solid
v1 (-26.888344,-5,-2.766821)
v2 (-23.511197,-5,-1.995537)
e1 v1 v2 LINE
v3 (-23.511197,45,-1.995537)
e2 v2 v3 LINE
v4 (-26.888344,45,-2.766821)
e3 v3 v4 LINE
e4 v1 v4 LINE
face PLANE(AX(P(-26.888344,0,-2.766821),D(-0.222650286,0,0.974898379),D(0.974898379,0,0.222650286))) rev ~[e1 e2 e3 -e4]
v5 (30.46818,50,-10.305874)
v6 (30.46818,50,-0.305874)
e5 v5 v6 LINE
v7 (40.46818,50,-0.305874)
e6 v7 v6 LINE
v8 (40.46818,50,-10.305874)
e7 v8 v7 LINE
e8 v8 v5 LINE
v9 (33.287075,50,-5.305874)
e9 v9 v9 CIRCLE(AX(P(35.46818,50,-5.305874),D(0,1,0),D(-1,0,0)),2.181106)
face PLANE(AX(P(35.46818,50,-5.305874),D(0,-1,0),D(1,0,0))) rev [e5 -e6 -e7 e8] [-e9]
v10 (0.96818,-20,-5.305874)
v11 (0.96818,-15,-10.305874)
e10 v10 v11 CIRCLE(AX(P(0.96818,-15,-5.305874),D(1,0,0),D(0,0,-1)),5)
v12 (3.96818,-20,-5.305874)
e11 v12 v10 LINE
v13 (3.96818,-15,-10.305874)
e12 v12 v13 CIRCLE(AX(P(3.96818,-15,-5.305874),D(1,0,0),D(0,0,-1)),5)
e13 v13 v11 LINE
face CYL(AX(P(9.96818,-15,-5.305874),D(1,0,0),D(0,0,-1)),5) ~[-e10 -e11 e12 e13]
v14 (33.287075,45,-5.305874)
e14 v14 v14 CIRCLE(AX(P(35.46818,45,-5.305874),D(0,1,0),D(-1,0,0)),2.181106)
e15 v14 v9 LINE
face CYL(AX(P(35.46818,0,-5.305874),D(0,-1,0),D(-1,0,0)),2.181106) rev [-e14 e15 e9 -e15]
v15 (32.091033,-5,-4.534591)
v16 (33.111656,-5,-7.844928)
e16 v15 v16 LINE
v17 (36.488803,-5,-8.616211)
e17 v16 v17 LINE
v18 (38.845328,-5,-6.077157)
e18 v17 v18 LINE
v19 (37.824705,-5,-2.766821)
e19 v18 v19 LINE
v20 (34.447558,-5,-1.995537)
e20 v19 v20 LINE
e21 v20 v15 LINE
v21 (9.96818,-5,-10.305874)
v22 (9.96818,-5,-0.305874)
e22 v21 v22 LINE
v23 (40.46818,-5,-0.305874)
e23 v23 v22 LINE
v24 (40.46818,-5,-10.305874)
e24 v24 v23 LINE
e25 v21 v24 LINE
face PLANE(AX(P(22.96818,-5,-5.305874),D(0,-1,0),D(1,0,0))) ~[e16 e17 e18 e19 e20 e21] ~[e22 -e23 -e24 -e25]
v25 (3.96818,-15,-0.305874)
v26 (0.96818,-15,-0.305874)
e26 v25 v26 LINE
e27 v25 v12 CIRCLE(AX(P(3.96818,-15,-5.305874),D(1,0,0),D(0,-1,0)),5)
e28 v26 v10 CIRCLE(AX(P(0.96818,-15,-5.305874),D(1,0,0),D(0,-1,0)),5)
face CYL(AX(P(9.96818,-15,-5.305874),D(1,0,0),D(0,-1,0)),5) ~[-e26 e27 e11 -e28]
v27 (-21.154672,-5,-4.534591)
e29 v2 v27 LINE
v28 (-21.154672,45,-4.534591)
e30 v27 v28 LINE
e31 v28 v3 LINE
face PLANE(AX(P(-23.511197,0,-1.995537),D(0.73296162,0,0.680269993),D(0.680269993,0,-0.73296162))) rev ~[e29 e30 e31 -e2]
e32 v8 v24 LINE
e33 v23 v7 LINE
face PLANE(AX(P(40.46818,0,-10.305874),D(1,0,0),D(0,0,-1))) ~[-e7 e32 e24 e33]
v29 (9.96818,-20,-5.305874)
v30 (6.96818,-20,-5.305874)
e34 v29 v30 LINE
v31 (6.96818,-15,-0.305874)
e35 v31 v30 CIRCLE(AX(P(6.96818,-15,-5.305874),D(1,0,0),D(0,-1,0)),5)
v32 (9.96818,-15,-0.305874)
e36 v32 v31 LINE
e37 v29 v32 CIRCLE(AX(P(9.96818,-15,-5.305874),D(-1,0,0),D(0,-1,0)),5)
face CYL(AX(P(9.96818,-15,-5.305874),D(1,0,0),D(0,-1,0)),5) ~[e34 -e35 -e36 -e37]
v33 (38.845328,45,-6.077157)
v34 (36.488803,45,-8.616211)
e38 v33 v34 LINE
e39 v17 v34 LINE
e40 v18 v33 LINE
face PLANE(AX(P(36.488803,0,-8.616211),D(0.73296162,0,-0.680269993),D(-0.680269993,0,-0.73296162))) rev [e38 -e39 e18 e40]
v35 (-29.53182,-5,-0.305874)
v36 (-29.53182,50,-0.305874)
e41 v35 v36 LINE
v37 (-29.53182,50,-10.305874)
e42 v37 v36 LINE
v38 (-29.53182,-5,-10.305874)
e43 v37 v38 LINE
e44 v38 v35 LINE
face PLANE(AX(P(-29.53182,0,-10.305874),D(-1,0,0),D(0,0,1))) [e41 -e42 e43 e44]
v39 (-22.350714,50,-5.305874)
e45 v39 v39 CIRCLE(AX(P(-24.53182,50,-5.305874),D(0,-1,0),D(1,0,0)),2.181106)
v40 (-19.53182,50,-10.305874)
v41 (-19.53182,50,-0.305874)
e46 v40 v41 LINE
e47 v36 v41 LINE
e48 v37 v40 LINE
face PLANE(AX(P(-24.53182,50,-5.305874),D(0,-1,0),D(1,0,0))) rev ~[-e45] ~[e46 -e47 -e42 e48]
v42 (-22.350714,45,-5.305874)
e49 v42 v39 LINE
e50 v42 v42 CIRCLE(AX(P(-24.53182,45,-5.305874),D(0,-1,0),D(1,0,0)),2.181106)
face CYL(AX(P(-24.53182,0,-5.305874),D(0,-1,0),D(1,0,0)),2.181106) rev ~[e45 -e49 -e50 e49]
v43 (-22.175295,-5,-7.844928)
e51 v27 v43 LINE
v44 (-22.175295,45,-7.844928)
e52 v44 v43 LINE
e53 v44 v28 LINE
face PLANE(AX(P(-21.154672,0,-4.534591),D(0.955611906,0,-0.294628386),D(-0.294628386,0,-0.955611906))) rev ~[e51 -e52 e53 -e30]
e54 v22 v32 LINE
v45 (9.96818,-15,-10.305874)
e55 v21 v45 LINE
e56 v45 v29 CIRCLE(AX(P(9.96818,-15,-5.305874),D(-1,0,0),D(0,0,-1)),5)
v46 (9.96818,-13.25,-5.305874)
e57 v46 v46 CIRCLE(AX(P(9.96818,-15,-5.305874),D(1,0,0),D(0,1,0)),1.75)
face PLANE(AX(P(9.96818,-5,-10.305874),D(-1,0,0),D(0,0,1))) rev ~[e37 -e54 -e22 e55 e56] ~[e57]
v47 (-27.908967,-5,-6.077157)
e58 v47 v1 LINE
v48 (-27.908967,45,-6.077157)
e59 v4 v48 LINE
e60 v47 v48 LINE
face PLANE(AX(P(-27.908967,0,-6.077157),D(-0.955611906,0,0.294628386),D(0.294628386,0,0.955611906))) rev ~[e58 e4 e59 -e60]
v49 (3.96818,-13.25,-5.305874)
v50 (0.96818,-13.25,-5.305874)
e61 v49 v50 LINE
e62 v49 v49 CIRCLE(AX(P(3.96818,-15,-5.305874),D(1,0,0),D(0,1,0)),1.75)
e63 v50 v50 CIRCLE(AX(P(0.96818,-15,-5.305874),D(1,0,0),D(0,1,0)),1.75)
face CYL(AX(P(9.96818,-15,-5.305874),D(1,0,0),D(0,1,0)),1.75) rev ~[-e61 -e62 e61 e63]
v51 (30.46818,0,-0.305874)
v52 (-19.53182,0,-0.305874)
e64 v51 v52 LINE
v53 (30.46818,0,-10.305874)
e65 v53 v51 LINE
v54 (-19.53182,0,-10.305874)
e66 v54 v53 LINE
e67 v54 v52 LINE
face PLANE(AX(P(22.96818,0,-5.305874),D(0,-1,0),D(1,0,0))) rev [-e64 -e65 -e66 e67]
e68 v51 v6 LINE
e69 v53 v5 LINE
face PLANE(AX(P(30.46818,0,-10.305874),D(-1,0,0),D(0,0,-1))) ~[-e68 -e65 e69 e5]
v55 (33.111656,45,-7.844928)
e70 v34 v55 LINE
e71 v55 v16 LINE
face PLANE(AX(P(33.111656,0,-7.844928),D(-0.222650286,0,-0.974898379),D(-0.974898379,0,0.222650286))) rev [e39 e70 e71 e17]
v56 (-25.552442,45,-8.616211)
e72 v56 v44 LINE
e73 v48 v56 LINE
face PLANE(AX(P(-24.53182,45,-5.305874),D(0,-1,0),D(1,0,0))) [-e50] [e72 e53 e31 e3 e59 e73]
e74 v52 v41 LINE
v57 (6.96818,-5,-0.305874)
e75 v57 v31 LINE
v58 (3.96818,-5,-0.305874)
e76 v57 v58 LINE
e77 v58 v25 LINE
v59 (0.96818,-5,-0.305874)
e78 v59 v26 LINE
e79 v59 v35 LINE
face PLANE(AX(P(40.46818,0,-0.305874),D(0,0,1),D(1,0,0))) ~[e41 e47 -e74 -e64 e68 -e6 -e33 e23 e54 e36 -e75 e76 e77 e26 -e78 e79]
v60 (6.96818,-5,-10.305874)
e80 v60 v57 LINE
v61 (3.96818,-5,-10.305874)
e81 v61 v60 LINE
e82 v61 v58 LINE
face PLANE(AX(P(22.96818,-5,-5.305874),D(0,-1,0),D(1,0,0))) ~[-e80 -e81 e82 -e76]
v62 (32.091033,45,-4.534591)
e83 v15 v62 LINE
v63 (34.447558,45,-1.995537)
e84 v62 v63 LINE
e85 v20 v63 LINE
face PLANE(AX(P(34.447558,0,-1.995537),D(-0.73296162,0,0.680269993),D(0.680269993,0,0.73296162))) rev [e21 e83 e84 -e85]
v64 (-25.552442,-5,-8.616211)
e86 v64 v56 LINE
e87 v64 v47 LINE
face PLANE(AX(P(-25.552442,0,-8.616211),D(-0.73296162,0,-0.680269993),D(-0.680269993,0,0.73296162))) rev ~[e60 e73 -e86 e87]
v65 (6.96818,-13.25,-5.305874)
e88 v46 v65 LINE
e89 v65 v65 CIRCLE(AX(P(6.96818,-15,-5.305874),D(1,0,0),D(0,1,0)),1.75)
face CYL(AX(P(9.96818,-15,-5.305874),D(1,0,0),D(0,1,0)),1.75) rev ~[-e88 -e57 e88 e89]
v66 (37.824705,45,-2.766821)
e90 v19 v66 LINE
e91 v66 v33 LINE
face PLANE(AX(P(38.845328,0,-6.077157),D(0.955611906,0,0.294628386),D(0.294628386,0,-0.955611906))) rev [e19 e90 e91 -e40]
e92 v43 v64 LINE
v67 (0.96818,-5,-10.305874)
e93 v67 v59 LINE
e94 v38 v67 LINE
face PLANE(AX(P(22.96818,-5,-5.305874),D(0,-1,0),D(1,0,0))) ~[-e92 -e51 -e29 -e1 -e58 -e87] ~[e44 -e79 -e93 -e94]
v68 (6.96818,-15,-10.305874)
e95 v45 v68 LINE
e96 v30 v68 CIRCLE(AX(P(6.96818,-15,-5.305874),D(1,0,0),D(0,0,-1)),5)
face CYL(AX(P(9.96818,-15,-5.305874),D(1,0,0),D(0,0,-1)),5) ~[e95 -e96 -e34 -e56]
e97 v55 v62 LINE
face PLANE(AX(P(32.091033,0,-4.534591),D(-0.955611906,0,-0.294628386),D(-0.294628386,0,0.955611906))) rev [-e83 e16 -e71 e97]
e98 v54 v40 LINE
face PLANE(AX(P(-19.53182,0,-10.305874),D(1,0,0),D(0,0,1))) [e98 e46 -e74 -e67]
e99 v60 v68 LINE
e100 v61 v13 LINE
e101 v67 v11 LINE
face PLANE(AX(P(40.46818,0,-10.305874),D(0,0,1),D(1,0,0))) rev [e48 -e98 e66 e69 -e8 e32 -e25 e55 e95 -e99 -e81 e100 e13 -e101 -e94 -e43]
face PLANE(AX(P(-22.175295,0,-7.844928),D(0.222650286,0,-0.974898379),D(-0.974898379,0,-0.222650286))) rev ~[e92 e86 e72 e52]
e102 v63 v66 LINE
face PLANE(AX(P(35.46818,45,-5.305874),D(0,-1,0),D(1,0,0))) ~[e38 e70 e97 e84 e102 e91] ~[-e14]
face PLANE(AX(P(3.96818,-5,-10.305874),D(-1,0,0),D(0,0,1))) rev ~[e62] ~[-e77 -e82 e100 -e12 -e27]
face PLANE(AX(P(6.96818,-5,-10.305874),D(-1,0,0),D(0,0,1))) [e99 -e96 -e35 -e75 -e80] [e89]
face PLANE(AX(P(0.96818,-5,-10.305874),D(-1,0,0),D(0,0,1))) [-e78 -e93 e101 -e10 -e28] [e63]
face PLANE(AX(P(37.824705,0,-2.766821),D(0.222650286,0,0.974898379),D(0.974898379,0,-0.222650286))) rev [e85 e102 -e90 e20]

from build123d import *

# Parameters (mm, degrees)
F0_W      = 10
F0_H      = 10
F0_R      = 2.18110555
F1_DEPTH  = 50
F2_R      = 2.18110555
F2_R_2    = 1.75
F3_DEPTH  = 45
F4_W      = 35
F4_H      = 10
F5_DEPTH  = 5
F7_W      = 3
F7_H      = 10
F8_DEPTH  = 15
F9_R      = 1.75
F10_DEPTH = 39.501


# Not quite as in the source:
# - a feature names something its author has since deleted; it is built from what else it names


with BuildPart() as f1:
    # F0 (on Front) → F1 (new body)
    with BuildSketch(Plane.XZ):
        with Locations((-24.531819516, -5.3058740483)):
            Rectangle(F0_W, F0_H)
        with Locations((-24.531819516, -5.3058740483)):
            Circle(F0_R, mode=Mode.SUBTRACT)
    extrude(amount=-F1_DEPTH)

    # F2 (on face) → F3 (cut)
    with BuildSketch(Plane.XZ):
        Polygon((-22.1752951329, -7.844927579), (-21.1546724653, -4.5345908332), (-23.5111968485, -1.9955373025), (-26.8883438992, -2.7668205176), (-27.9089665667, -6.0771572634), (-25.5524421836, -8.6162107941), align=None)
        with Locations((-24.531819516, -5.3058740483)):
            Circle(F2_R, mode=Mode.SUBTRACT)
        Polygon((36.9860127402, -8.419743866), (38.9237869783, -5.5483276646), (37.4059547221, -2.4344578468), (33.9503482277, -2.1920042306), (32.0125739896, -5.063420432), (33.5304062458, -8.1772902498), align=None)
        with Locations((35.468180484, -5.3058740483)):
            Circle(F2_R_2, mode=Mode.SUBTRACT)
    extrude(amount=-F3_DEPTH, mode=Mode.SUBTRACT)

    # F4 (on face) → F5 (join)
    with BuildSketch(Plane.XZ):
        with Locations((-12.031819516, -5.3058740483)):
            Rectangle(F4_W, F4_H)
        Polygon((-22.1752951329, -7.844927579), (-25.5524421836, -8.6162107941), (-27.9089665667, -6.0771572634), (-26.8883438992, -2.7668205176), (-23.5111968485, -1.9955373025), (-21.1546724653, -4.5345908332), align=None, mode=Mode.SUBTRACT)
    extrude(amount=F5_DEPTH)

    # F6: F1 across face


with BuildPart() as f1_1:
    add(f1.part)
    add(f1.part.mirror(Plane(origin=(5.468180484, -2.5, -5.3058740483), x_dir=(0, 1, 0), z_dir=(1, 0, 0))))

    # F7 (on face) → F8 (join)
    with BuildSketch(Plane.XZ.offset(5)):
        with Locations((8.468180484, -5.3058740483)):
            Rectangle(F7_W, F7_H)
        with Locations((2.468180484, -5.3058740483)):
            Rectangle(F7_W, F7_H)
    extrude(amount=F8_DEPTH)

    # F9 (on face) → F10 (cut, through all)
    with BuildSketch(Plane.YZ.offset(9.968180484)):
        with BuildLine():
            ThreePointArc((-20, -5.3058740483), (-18.5355339059, -1.7703401424), (-15, -0.3058740483))
            Line((-15, -0.3058740483), (-20, -0.3058740483))
            Line((-20, -0.3058740483), (-20, -5.3058740483))
        make_face()
        with Locations((-15, -5.3058740483)):
            Circle(F9_R)
        with BuildLine():
            ThreePointArc((-15, -10.3058740483), (-18.5355339059, -8.8414079542), (-20, -5.3058740483))
            Line((-20, -5.3058740483), (-20, -10.3058740483))
            Line((-20, -10.3058740483), (-15, -10.3058740483))
        make_face()
    extrude(amount=-F10_DEPTH, mode=Mode.SUBTRACT)


solid = f1_1.part
